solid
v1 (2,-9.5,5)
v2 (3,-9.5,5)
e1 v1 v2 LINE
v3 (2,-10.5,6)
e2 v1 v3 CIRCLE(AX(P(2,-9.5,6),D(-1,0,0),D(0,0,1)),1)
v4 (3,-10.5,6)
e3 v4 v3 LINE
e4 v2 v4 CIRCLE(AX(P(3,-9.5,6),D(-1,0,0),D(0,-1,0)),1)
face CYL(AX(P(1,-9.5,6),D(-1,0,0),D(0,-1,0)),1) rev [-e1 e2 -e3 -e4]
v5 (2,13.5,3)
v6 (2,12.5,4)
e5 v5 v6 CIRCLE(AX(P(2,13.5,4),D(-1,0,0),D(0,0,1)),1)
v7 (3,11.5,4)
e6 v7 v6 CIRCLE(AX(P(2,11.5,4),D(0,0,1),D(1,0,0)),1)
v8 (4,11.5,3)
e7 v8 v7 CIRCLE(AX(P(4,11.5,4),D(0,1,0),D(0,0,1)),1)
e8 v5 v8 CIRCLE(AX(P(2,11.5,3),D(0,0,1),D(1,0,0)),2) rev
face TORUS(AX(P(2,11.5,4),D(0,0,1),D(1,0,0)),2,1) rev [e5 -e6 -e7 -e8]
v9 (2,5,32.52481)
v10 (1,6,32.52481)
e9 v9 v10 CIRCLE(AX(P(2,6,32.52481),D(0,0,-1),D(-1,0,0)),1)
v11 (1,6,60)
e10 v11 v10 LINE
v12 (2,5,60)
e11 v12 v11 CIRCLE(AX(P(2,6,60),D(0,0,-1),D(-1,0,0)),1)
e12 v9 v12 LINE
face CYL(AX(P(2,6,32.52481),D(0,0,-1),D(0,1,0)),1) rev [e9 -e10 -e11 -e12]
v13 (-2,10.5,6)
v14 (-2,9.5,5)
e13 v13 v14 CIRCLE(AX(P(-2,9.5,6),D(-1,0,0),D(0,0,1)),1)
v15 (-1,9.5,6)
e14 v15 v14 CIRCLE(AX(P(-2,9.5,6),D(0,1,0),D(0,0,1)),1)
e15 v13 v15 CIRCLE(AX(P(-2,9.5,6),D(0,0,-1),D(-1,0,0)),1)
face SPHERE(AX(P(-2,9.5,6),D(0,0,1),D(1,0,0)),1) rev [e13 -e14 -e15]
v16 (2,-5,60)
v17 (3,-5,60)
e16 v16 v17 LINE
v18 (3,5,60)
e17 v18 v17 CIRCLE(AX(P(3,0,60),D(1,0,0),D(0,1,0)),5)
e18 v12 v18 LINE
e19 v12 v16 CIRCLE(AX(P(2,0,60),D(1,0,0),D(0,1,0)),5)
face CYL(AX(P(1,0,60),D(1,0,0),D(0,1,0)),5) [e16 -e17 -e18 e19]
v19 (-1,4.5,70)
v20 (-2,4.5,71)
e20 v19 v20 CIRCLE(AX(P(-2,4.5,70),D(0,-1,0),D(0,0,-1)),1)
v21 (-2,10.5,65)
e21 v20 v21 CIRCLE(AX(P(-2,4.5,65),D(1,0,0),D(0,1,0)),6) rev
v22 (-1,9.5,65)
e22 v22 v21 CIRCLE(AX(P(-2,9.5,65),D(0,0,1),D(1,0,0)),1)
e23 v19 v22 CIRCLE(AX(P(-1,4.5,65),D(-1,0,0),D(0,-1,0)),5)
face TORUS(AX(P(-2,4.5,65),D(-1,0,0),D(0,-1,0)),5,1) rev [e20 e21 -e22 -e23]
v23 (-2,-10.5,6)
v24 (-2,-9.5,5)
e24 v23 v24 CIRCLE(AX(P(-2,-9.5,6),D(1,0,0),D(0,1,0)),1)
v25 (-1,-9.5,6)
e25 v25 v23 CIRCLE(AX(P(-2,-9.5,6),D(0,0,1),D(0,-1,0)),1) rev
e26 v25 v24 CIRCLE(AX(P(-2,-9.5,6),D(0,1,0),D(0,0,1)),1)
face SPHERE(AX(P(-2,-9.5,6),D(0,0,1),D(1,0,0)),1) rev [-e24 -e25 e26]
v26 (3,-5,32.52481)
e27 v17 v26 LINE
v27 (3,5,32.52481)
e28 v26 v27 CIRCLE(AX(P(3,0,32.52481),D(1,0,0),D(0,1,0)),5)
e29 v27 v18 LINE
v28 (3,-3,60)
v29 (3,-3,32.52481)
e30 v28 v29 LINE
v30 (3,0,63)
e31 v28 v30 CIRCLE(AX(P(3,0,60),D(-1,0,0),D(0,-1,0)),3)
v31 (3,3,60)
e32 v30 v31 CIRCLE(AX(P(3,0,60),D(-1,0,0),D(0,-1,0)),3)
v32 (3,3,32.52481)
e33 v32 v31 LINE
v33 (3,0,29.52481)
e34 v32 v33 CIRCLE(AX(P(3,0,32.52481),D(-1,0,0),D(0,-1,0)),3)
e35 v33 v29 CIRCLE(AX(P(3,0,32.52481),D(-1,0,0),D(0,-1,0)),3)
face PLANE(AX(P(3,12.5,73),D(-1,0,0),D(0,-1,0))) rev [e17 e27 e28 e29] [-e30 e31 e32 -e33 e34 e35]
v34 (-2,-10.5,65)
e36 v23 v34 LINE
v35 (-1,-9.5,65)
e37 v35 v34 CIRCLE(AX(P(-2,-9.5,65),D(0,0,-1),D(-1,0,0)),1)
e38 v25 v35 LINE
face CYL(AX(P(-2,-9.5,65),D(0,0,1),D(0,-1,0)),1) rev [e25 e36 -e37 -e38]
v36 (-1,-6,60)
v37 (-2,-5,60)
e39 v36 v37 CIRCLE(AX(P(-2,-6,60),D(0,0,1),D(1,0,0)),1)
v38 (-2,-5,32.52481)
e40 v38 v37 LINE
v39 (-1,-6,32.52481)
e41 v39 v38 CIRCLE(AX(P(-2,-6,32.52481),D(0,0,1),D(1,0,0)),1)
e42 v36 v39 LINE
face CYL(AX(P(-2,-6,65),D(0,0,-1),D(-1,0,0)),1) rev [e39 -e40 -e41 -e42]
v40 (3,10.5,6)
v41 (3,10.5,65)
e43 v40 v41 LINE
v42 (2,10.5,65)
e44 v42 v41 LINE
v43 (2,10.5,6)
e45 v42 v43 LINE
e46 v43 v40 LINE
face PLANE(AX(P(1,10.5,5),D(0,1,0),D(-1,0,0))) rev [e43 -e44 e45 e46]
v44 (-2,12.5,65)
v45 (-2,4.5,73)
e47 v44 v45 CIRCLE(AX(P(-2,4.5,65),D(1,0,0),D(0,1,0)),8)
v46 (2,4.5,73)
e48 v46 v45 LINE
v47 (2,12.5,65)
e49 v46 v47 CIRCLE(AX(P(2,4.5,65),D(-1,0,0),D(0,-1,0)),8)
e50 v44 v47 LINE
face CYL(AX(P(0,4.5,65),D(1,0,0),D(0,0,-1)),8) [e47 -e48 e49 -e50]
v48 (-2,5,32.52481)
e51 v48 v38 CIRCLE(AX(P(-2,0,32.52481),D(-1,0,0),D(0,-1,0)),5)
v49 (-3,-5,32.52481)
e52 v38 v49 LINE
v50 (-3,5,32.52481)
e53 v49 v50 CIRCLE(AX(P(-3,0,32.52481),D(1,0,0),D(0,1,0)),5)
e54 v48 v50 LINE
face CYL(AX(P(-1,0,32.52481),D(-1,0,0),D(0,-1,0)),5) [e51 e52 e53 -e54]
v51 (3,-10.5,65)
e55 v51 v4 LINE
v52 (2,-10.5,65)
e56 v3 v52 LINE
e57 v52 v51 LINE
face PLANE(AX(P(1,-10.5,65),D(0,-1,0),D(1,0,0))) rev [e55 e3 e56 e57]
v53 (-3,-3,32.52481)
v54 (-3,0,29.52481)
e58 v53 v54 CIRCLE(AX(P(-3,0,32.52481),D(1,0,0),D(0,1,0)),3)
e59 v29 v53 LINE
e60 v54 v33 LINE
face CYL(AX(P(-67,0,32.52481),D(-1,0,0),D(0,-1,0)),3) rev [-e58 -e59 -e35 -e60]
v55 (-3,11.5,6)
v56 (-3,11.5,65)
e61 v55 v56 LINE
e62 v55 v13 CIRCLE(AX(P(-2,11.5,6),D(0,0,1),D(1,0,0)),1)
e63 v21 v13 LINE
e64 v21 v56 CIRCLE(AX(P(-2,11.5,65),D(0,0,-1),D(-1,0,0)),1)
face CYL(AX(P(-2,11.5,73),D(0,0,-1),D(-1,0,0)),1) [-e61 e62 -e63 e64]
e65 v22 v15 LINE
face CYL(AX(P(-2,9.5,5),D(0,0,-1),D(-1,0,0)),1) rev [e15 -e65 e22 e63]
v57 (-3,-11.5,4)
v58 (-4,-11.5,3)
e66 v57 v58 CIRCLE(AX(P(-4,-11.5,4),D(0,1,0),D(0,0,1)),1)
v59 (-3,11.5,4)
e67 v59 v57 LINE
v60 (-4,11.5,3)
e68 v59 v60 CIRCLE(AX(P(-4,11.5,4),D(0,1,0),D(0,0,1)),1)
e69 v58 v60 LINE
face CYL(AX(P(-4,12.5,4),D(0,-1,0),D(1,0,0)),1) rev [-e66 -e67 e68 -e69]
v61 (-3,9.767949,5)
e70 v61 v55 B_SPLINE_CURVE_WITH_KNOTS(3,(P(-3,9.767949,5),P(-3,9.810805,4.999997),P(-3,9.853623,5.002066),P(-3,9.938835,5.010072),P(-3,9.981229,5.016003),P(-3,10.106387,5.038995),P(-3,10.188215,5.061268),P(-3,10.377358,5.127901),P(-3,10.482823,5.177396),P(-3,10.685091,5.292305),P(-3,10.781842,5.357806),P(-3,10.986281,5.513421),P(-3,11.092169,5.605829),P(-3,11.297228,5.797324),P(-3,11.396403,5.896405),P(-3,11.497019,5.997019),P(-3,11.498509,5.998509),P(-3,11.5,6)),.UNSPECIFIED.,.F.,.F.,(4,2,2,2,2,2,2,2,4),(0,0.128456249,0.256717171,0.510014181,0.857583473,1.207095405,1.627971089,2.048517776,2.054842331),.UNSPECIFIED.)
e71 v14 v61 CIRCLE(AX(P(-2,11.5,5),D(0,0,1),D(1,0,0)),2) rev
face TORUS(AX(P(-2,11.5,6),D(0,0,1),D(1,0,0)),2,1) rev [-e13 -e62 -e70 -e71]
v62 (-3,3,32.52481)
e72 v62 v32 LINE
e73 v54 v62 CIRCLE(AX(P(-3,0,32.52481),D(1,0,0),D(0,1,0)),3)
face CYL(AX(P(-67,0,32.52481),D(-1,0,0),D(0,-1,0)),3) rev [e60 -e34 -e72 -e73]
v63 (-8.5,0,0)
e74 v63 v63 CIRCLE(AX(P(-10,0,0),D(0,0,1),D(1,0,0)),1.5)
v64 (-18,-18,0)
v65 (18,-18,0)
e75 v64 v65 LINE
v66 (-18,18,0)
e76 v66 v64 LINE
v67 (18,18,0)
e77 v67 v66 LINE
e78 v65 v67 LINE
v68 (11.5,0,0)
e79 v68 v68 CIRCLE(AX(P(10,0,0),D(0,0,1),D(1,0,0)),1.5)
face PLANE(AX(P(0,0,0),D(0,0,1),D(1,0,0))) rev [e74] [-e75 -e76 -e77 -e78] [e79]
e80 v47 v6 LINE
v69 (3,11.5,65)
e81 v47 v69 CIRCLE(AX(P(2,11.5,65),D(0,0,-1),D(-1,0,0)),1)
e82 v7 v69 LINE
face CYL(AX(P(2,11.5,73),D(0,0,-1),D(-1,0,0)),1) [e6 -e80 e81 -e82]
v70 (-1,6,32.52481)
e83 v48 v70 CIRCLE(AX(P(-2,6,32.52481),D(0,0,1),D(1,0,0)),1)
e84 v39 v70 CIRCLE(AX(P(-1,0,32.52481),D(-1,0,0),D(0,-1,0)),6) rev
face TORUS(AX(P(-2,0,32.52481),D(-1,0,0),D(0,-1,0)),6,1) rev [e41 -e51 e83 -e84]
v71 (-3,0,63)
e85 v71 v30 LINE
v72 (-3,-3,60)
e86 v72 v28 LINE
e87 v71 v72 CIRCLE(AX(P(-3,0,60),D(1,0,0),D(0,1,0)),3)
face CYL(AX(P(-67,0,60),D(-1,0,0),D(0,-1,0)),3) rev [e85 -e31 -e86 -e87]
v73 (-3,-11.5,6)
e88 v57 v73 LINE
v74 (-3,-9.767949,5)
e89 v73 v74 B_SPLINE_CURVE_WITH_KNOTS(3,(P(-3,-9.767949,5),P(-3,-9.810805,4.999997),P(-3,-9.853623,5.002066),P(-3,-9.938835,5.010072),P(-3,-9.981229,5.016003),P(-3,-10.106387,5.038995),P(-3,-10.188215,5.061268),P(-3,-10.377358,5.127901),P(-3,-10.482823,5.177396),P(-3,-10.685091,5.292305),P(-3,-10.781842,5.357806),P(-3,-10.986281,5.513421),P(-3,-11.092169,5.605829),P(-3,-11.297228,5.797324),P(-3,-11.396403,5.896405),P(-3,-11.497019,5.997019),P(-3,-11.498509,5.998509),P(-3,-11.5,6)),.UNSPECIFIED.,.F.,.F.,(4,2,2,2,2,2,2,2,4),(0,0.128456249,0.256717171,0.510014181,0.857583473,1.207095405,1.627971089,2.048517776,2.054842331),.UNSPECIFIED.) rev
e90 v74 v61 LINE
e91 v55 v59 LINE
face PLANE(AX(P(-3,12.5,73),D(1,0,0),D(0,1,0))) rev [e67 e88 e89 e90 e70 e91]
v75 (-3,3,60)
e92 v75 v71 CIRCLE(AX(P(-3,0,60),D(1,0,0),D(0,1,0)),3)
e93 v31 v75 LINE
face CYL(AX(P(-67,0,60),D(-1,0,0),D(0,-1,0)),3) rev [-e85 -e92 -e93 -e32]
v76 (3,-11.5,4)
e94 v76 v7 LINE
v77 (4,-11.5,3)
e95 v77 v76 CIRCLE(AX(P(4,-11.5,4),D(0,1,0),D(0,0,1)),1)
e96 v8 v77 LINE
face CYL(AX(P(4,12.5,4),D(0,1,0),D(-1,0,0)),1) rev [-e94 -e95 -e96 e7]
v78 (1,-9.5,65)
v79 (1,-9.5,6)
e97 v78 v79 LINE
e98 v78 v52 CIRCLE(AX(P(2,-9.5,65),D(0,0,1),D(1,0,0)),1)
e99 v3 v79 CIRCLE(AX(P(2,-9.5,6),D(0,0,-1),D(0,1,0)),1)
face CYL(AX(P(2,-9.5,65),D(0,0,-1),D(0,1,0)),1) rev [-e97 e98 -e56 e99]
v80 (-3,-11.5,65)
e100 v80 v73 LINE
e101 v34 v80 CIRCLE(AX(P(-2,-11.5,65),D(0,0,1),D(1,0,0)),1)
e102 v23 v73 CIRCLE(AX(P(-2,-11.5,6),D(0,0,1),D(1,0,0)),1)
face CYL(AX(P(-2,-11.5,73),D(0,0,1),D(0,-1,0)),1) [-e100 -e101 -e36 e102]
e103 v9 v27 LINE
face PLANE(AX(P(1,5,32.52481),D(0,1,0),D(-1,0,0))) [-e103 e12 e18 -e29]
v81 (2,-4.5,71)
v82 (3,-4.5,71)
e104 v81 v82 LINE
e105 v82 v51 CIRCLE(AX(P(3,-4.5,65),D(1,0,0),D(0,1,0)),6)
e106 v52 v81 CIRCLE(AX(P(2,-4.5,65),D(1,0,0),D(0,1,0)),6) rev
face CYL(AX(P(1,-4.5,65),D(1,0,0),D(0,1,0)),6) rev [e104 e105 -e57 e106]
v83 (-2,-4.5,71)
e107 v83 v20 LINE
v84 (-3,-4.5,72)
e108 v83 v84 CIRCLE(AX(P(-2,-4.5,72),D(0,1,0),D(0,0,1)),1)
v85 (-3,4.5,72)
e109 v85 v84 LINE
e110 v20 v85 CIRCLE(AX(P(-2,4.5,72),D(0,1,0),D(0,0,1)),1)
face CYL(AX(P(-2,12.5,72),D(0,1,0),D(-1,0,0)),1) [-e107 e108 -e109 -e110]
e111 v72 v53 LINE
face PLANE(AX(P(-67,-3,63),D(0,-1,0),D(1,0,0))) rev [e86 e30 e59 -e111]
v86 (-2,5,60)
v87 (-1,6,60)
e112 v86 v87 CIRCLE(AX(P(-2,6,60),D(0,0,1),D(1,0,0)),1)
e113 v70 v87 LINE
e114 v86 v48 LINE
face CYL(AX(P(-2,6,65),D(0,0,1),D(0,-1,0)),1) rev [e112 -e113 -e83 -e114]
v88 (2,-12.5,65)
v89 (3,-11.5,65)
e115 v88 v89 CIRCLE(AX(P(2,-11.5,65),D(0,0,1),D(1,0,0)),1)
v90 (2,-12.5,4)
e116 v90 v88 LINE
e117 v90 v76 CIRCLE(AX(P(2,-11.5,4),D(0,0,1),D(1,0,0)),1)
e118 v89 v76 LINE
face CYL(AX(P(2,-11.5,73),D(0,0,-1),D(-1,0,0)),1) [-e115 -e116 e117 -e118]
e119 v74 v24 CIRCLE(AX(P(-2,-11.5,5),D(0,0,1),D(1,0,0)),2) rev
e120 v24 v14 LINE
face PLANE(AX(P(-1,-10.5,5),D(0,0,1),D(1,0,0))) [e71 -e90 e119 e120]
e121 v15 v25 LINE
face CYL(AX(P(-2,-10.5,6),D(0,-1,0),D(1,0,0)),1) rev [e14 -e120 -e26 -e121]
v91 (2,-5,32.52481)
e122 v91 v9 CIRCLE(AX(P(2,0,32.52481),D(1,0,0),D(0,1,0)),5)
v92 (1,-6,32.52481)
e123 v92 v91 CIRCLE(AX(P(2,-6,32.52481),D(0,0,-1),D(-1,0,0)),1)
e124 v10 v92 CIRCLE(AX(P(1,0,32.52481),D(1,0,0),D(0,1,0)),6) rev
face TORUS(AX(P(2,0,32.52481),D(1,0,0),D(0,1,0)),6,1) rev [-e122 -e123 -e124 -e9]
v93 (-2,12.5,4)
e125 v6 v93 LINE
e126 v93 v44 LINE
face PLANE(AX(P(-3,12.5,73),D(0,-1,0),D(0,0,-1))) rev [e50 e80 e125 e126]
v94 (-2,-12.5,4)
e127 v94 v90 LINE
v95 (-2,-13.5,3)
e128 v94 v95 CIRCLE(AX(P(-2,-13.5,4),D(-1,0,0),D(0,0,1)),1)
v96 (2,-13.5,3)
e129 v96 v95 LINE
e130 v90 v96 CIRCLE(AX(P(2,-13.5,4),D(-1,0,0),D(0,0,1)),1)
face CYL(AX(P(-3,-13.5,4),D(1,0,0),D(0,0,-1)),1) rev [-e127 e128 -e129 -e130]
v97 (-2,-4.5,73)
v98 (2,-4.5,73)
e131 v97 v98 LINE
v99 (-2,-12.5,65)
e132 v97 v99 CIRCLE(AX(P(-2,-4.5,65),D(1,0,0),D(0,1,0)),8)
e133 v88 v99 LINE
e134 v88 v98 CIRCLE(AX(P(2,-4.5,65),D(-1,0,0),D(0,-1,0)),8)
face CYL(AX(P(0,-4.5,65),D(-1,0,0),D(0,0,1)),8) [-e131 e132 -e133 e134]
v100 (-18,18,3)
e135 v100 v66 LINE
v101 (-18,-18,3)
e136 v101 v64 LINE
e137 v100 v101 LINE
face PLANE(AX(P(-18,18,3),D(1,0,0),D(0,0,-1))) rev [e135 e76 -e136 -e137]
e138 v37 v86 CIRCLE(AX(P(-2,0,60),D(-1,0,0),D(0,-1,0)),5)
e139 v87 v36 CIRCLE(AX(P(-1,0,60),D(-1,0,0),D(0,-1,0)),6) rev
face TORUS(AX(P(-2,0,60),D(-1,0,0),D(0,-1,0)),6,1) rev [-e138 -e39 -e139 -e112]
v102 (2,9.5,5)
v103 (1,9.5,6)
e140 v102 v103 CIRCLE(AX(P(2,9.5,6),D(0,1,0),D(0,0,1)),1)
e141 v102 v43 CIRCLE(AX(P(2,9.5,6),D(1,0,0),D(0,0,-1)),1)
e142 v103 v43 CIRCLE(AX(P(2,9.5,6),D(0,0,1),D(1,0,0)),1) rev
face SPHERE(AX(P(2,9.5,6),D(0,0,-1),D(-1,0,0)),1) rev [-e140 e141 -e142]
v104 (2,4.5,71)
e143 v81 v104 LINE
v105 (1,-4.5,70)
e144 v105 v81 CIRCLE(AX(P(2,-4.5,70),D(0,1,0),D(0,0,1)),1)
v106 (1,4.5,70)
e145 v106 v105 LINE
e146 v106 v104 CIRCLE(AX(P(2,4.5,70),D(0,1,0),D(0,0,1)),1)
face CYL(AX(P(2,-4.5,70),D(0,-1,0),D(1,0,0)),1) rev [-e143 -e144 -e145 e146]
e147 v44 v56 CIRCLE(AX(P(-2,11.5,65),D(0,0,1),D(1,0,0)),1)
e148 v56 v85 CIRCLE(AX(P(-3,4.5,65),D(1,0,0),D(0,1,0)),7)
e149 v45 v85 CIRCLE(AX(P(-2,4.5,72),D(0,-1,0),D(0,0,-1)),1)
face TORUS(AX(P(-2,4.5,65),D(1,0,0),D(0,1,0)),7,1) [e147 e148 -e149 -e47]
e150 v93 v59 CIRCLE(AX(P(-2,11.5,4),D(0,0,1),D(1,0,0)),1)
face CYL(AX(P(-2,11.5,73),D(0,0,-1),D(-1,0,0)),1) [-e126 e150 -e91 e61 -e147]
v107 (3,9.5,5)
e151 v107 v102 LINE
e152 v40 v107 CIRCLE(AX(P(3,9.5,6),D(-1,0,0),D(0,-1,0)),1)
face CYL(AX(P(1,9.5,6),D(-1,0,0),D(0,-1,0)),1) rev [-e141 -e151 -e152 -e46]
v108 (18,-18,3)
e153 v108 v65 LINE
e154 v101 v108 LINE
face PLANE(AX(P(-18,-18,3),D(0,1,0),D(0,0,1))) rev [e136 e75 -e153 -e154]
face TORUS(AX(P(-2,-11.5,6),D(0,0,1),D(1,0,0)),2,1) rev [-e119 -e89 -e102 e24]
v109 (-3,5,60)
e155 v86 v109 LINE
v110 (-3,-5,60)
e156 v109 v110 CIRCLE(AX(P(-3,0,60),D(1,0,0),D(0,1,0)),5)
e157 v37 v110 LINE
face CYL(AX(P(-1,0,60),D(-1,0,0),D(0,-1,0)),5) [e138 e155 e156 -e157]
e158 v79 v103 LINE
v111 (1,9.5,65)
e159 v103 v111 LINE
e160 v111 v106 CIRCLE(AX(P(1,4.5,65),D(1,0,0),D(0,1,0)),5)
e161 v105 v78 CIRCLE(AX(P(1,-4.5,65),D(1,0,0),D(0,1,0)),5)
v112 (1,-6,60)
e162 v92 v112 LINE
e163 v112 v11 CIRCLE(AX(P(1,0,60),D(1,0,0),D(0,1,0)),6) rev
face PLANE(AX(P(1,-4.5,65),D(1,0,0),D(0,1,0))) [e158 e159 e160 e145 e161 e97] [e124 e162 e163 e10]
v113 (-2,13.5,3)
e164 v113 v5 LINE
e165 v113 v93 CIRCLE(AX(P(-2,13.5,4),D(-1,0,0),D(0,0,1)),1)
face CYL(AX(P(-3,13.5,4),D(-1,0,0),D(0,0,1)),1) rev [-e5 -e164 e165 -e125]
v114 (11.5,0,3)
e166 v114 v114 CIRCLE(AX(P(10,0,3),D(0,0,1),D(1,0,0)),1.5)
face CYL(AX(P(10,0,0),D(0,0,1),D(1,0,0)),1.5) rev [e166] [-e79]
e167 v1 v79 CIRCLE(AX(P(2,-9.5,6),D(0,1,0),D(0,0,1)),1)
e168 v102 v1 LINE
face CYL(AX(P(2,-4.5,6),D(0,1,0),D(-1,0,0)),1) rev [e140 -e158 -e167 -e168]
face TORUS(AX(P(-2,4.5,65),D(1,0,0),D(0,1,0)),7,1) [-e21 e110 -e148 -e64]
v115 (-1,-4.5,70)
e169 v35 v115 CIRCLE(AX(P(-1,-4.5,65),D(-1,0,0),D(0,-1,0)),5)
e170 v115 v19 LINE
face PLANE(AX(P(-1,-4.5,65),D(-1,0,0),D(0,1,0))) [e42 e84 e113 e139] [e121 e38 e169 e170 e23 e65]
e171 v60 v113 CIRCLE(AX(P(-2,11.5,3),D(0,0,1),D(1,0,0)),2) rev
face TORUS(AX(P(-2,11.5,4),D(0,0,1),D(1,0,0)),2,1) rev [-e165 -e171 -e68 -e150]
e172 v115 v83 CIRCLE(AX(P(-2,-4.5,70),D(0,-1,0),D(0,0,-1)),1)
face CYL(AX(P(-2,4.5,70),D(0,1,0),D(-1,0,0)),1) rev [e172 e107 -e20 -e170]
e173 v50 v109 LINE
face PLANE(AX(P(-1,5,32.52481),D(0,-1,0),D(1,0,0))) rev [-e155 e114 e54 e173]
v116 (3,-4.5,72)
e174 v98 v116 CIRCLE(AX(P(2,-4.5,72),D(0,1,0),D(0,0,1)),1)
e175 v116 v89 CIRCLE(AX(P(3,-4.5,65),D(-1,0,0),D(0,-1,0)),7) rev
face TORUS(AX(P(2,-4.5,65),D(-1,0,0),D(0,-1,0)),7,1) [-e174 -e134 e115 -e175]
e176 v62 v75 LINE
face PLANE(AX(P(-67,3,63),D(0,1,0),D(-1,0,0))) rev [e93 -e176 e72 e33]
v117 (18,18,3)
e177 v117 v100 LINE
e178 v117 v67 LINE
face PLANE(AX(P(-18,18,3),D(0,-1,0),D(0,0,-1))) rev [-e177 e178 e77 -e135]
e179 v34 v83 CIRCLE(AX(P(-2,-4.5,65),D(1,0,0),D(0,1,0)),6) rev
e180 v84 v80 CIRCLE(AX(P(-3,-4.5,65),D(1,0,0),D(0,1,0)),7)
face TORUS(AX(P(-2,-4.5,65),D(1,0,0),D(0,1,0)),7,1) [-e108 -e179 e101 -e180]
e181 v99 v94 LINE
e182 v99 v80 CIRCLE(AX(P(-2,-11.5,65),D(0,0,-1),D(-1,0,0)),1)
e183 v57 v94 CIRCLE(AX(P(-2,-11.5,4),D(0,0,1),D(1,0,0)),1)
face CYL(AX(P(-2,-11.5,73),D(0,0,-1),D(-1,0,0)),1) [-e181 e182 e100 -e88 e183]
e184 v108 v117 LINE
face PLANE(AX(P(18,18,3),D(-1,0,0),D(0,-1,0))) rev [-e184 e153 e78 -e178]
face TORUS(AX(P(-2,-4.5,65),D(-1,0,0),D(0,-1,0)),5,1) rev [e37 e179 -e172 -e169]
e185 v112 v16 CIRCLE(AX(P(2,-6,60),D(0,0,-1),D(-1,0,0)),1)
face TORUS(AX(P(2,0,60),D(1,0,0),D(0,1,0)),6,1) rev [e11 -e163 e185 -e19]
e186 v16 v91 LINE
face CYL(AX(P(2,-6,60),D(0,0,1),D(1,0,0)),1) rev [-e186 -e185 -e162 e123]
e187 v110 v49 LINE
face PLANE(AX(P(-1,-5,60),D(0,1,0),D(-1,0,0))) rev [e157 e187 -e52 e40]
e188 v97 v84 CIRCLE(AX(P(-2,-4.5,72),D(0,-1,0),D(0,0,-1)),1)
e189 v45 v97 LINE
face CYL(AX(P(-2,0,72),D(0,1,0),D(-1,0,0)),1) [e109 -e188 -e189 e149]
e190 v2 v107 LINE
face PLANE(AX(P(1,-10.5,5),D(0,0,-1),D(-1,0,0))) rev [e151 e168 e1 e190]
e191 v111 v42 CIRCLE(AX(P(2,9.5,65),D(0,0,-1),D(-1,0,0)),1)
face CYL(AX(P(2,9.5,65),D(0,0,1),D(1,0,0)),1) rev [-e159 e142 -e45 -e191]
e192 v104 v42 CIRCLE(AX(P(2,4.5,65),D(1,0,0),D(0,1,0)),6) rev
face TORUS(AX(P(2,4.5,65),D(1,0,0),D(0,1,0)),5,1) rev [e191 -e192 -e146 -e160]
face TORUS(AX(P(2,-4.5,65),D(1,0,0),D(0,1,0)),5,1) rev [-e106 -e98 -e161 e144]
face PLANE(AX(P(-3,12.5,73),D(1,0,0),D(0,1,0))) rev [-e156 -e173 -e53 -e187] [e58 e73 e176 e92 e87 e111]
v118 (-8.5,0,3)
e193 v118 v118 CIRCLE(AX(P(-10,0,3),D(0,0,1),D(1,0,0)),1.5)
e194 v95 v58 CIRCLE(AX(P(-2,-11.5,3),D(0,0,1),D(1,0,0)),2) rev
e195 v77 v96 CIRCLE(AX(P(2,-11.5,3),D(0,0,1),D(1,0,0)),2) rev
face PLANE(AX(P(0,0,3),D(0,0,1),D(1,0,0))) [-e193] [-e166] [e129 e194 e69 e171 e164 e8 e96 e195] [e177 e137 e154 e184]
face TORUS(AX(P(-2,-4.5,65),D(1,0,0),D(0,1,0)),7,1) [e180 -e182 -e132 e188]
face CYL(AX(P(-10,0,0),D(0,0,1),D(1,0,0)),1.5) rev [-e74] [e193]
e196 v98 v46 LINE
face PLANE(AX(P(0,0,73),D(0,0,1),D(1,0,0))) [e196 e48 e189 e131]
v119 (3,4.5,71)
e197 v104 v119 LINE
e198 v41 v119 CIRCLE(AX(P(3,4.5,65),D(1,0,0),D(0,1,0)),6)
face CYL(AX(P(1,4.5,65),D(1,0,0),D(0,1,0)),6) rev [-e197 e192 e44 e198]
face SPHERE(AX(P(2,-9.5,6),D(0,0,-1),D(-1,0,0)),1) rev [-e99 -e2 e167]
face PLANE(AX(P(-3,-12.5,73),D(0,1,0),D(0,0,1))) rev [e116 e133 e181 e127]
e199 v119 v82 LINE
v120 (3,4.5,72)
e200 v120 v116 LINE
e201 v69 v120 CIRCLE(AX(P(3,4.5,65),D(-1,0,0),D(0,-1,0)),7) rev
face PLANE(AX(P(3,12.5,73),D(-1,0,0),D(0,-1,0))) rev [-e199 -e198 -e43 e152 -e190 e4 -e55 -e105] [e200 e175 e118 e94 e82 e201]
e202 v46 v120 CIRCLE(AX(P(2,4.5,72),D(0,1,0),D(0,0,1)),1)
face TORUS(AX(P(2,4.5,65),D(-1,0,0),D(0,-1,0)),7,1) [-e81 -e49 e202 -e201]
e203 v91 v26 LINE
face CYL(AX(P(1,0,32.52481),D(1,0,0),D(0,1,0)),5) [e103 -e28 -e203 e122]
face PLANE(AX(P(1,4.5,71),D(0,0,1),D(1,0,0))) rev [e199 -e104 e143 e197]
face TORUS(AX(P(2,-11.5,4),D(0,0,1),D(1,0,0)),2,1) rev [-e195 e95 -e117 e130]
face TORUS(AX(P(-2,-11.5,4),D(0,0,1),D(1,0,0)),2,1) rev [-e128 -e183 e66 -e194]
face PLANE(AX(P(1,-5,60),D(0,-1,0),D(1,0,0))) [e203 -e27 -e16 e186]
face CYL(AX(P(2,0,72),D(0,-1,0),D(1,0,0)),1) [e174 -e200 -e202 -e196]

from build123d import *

# Parameters (mm, degrees)
SKETCH1_W           = 36
SKETCH1_H           = 36
BOSS_EXTRUDE1_DEPTH = 3
SKETCH2_R           = 1.5
CUT_EXTRUDE1_DEPTH  = 3
SKETCH3_W           = 6
SKETCH3_H           = 25
BOSS_EXTRUDE2_DEPTH = 70
SKETCH4_W           = 33.475190479
SKETCH4_H           = 6
CUT_EXTRUDE2_DEPTH  = 70
FILLET1_R           = 3
FILLET2_R           = 8
CUT_EXTRUDE3_DEPTH  = 2
FILLET3_R           = 1
FILLET4_R           = 1
FILLET5_R           = 1
FILLET6_R           = 1
FILLET7_R           = 1
FILLET8_R           = 1
FILLET10_R          = 1
FILLET11_R          = 1


with BuildPart() as part:
    # Sketch1 → Boss-Extrude1 (new body)
    with BuildSketch(Plane.XY):
        Rectangle(SKETCH1_W, SKETCH1_H)
    extrude(amount=BOSS_EXTRUDE1_DEPTH)

    # Sketch2 → Cut-Extrude1 (cut)
    with BuildSketch(Plane.XY.offset(3)):
        with Locations((-10, 0)):
            Circle(SKETCH2_R)
        with Locations((10, 0)):
            Circle(SKETCH2_R)
    extrude(amount=-CUT_EXTRUDE1_DEPTH, mode=Mode.SUBTRACT)

    # Sketch3 → Boss-Extrude2 (add)
    with BuildSketch(Plane.XY.offset(3)):
        Rectangle(SKETCH3_W, SKETCH3_H)
    extrude(amount=BOSS_EXTRUDE2_DEPTH)

    # Sketch4 → Cut-Extrude2 (cut)
    with BuildSketch(Plane(origin=(3, 0, 0), x_dir=(0, 0, -1), z_dir=(1, 0, 0))):
        with Locations((-46.262404761, 0)):
            Rectangle(SKETCH4_W, SKETCH4_H)
    extrude(amount=-CUT_EXTRUDE2_DEPTH, mode=Mode.SUBTRACT)

    # Fillet1
    fillet1_edges = [part.edges().sort_by_distance(p)[0] for p in [
        (0, -3, 63),
        (0, 3, 63),
        (0, 3, 29.524809521),
        (0, -3, 29.524809521),
    ]]
    fillet(fillet1_edges, radius=FILLET1_R - 0.0001)  # a hair under: the kernel refuses the full size

    # Fillet2
    fillet2_edges = [part.edges().sort_by_distance(p)[0] for p in [
        (0, 12.5, 73),
        (0, -12.5, 73),
    ]]
    fillet(fillet2_edges, radius=FILLET2_R)

    # Sketch6 → Cut-Extrude3 (cut)
    with BuildSketch(Plane(origin=(3, 0, 0), x_dir=(0, 0, -1), z_dir=(1, 0, 0))):
        with BuildLine():
            Line((-65, -10.5), (-5, -10.5))
            Line((-5, -10.5), (-5, 10.5))
            Line((-5, 10.5), (-65, 10.5))
            ThreePointArc((-65, 10.5), (-69.242640687, 8.742640687), (-71, 4.5))
            Line((-71, 4.5), (-71, -4.5))
            ThreePointArc((-71, -4.5), (-69.242640687, -8.742640687), (-65, -10.5))
        make_face()
        with BuildLine():
            Line((-32.524809521, 5), (-60, 5))
            ThreePointArc((-60, 5), (-63.535533906, 3.535533906), (-65, 0))
            ThreePointArc((-65, 0), (-63.535533906, -3.535533906), (-60, -5))
            Line((-60, -5), (-32.524809521, -5))
            ThreePointArc((-32.524809521, -5), (-28.989275615, -3.535533906), (-27.524809521, 0))
            ThreePointArc((-27.524809521, 0), (-28.989275615, 3.535533906), (-32.524809521, 5))
        make_face(mode=Mode.SUBTRACT)
    cut_extrude3 = extrude(amount=-CUT_EXTRUDE3_DEPTH, mode=Mode.SUBTRACT)

    # Mirror3: Cut-Extrude3 across plane
    add(cut_extrude3.mirror(Plane(origin=(0, 0, 0), x_dir=(0, 0, 1), z_dir=(1, 0, 0))), mode=Mode.SUBTRACT)

    # Fillet3
    fillet3_edges = [part.edges().sort_by_distance(p)[0] for p in [
        (-1, 10.5, 35),
        (-1, 8.742640687, 69.242640687),
        (-1, -10.5, 35),
        (-1, -8.742640687, 69.242640687),
        (-3, 10.5, 35),
        (-3, 8.742640687, 69.242640687),
        (-3, -10.5, 35),
        (-3, -8.742640687, 69.242640687),
        (-1, 0, 71),
        (-3, 0, 71),
    ]]
    fillet(fillet3_edges, radius=FILLET3_R - 0.0001)  # a hair under: the kernel refuses the full size

    # Fillet4
    fillet4_edges = [part.edges().sort_by_distance(p)[0] for p in [
        (-1, 0, 5),
        (-1.292863929, -10.207136071, 5),
        (-1.292863929, 10.207136071, 5),
        (-2.707136071, 10.792863929, 5),
        (-2.707136071, -10.792863929, 5),
    ]]
    fillet(fillet4_edges, radius=FILLET4_R - 0.0001)  # a hair under: the kernel refuses the full size

    # Fillet5
    fillet5_edges = [part.edges().sort_by_distance(p)[0] for p in [
        (-3, 0, 73),
        (-3, -12.5, 34),
        (-3, 12.5, 34),
        (-3, 10.156854249, 70.656854249),
        (-3, -10.156854249, 70.656854249),
    ]]
    fillet(fillet5_edges, radius=FILLET5_R)

    # Fillet6
    fillet6_edges = [part.edges().sort_by_distance(p)[0] for p in [
        (-1, 0, 27.524809521),
        (-1, 5, 46.26240476),
        (-1, 0, 65),
        (-1, -5, 46.26240476),
    ]]
    fillet(fillet6_edges, radius=FILLET6_R)

    # Fillet7
    fillet7_edges = [part.edges().sort_by_distance(p)[0] for p in [
        (1, -8.742640687, 69.242640687),
        (1, 0, 71),
        (1, 8.742640687, 69.242640687),
        (1, 10.5, 35),
        (1, -10.5, 35),
    ]]
    fillet(fillet7_edges, radius=FILLET7_R)

    # Fillet8
    fillet8_edges = [part.edges().sort_by_distance(p)[0] for p in [
        (1, 0, 5),
        (2.5, 10.5, 5),
        (2.5, -10.5, 5),
        (1.292893219, 10.207106781, 5),
        (1.292893219, -10.207106781, 5),
    ]]
    fillet(fillet8_edges, radius=FILLET8_R)

    # Fillet10
    fillet10_edges = [part.edges().sort_by_distance(p)[0] for p in [
        (3, 0, 73),
        (3, 12.5, 34),
        (3, -12.5, 34),
        (3, 10.156854249, 70.656854249),
        (3, -10.156854249, 70.656854249),
    ]]
    fillet(fillet10_edges, radius=FILLET10_R)

    # Fillet11
    fillet11_edges = [part.edges().sort_by_distance(p)[0] for p in [
        (0, -12.5, 3),
        (-3, 0, 3),
        (-2.707106781, -12.207106781, 3),
        (-2.707106781, 12.207106781, 3),
        (0, 12.5, 3),
        (3, 0, 3),
        (2.707106781, 12.207106781, 3),
        (2.707106781, -12.207106781, 3),
        (1, 0, 65),
        (1, -5, 46.26240476),
        (1, 0, 27.524809521),
        (1, 5, 46.26240476),
    ]]
    fillet(fillet11_edges, radius=FILLET11_R)


solid = part.part
